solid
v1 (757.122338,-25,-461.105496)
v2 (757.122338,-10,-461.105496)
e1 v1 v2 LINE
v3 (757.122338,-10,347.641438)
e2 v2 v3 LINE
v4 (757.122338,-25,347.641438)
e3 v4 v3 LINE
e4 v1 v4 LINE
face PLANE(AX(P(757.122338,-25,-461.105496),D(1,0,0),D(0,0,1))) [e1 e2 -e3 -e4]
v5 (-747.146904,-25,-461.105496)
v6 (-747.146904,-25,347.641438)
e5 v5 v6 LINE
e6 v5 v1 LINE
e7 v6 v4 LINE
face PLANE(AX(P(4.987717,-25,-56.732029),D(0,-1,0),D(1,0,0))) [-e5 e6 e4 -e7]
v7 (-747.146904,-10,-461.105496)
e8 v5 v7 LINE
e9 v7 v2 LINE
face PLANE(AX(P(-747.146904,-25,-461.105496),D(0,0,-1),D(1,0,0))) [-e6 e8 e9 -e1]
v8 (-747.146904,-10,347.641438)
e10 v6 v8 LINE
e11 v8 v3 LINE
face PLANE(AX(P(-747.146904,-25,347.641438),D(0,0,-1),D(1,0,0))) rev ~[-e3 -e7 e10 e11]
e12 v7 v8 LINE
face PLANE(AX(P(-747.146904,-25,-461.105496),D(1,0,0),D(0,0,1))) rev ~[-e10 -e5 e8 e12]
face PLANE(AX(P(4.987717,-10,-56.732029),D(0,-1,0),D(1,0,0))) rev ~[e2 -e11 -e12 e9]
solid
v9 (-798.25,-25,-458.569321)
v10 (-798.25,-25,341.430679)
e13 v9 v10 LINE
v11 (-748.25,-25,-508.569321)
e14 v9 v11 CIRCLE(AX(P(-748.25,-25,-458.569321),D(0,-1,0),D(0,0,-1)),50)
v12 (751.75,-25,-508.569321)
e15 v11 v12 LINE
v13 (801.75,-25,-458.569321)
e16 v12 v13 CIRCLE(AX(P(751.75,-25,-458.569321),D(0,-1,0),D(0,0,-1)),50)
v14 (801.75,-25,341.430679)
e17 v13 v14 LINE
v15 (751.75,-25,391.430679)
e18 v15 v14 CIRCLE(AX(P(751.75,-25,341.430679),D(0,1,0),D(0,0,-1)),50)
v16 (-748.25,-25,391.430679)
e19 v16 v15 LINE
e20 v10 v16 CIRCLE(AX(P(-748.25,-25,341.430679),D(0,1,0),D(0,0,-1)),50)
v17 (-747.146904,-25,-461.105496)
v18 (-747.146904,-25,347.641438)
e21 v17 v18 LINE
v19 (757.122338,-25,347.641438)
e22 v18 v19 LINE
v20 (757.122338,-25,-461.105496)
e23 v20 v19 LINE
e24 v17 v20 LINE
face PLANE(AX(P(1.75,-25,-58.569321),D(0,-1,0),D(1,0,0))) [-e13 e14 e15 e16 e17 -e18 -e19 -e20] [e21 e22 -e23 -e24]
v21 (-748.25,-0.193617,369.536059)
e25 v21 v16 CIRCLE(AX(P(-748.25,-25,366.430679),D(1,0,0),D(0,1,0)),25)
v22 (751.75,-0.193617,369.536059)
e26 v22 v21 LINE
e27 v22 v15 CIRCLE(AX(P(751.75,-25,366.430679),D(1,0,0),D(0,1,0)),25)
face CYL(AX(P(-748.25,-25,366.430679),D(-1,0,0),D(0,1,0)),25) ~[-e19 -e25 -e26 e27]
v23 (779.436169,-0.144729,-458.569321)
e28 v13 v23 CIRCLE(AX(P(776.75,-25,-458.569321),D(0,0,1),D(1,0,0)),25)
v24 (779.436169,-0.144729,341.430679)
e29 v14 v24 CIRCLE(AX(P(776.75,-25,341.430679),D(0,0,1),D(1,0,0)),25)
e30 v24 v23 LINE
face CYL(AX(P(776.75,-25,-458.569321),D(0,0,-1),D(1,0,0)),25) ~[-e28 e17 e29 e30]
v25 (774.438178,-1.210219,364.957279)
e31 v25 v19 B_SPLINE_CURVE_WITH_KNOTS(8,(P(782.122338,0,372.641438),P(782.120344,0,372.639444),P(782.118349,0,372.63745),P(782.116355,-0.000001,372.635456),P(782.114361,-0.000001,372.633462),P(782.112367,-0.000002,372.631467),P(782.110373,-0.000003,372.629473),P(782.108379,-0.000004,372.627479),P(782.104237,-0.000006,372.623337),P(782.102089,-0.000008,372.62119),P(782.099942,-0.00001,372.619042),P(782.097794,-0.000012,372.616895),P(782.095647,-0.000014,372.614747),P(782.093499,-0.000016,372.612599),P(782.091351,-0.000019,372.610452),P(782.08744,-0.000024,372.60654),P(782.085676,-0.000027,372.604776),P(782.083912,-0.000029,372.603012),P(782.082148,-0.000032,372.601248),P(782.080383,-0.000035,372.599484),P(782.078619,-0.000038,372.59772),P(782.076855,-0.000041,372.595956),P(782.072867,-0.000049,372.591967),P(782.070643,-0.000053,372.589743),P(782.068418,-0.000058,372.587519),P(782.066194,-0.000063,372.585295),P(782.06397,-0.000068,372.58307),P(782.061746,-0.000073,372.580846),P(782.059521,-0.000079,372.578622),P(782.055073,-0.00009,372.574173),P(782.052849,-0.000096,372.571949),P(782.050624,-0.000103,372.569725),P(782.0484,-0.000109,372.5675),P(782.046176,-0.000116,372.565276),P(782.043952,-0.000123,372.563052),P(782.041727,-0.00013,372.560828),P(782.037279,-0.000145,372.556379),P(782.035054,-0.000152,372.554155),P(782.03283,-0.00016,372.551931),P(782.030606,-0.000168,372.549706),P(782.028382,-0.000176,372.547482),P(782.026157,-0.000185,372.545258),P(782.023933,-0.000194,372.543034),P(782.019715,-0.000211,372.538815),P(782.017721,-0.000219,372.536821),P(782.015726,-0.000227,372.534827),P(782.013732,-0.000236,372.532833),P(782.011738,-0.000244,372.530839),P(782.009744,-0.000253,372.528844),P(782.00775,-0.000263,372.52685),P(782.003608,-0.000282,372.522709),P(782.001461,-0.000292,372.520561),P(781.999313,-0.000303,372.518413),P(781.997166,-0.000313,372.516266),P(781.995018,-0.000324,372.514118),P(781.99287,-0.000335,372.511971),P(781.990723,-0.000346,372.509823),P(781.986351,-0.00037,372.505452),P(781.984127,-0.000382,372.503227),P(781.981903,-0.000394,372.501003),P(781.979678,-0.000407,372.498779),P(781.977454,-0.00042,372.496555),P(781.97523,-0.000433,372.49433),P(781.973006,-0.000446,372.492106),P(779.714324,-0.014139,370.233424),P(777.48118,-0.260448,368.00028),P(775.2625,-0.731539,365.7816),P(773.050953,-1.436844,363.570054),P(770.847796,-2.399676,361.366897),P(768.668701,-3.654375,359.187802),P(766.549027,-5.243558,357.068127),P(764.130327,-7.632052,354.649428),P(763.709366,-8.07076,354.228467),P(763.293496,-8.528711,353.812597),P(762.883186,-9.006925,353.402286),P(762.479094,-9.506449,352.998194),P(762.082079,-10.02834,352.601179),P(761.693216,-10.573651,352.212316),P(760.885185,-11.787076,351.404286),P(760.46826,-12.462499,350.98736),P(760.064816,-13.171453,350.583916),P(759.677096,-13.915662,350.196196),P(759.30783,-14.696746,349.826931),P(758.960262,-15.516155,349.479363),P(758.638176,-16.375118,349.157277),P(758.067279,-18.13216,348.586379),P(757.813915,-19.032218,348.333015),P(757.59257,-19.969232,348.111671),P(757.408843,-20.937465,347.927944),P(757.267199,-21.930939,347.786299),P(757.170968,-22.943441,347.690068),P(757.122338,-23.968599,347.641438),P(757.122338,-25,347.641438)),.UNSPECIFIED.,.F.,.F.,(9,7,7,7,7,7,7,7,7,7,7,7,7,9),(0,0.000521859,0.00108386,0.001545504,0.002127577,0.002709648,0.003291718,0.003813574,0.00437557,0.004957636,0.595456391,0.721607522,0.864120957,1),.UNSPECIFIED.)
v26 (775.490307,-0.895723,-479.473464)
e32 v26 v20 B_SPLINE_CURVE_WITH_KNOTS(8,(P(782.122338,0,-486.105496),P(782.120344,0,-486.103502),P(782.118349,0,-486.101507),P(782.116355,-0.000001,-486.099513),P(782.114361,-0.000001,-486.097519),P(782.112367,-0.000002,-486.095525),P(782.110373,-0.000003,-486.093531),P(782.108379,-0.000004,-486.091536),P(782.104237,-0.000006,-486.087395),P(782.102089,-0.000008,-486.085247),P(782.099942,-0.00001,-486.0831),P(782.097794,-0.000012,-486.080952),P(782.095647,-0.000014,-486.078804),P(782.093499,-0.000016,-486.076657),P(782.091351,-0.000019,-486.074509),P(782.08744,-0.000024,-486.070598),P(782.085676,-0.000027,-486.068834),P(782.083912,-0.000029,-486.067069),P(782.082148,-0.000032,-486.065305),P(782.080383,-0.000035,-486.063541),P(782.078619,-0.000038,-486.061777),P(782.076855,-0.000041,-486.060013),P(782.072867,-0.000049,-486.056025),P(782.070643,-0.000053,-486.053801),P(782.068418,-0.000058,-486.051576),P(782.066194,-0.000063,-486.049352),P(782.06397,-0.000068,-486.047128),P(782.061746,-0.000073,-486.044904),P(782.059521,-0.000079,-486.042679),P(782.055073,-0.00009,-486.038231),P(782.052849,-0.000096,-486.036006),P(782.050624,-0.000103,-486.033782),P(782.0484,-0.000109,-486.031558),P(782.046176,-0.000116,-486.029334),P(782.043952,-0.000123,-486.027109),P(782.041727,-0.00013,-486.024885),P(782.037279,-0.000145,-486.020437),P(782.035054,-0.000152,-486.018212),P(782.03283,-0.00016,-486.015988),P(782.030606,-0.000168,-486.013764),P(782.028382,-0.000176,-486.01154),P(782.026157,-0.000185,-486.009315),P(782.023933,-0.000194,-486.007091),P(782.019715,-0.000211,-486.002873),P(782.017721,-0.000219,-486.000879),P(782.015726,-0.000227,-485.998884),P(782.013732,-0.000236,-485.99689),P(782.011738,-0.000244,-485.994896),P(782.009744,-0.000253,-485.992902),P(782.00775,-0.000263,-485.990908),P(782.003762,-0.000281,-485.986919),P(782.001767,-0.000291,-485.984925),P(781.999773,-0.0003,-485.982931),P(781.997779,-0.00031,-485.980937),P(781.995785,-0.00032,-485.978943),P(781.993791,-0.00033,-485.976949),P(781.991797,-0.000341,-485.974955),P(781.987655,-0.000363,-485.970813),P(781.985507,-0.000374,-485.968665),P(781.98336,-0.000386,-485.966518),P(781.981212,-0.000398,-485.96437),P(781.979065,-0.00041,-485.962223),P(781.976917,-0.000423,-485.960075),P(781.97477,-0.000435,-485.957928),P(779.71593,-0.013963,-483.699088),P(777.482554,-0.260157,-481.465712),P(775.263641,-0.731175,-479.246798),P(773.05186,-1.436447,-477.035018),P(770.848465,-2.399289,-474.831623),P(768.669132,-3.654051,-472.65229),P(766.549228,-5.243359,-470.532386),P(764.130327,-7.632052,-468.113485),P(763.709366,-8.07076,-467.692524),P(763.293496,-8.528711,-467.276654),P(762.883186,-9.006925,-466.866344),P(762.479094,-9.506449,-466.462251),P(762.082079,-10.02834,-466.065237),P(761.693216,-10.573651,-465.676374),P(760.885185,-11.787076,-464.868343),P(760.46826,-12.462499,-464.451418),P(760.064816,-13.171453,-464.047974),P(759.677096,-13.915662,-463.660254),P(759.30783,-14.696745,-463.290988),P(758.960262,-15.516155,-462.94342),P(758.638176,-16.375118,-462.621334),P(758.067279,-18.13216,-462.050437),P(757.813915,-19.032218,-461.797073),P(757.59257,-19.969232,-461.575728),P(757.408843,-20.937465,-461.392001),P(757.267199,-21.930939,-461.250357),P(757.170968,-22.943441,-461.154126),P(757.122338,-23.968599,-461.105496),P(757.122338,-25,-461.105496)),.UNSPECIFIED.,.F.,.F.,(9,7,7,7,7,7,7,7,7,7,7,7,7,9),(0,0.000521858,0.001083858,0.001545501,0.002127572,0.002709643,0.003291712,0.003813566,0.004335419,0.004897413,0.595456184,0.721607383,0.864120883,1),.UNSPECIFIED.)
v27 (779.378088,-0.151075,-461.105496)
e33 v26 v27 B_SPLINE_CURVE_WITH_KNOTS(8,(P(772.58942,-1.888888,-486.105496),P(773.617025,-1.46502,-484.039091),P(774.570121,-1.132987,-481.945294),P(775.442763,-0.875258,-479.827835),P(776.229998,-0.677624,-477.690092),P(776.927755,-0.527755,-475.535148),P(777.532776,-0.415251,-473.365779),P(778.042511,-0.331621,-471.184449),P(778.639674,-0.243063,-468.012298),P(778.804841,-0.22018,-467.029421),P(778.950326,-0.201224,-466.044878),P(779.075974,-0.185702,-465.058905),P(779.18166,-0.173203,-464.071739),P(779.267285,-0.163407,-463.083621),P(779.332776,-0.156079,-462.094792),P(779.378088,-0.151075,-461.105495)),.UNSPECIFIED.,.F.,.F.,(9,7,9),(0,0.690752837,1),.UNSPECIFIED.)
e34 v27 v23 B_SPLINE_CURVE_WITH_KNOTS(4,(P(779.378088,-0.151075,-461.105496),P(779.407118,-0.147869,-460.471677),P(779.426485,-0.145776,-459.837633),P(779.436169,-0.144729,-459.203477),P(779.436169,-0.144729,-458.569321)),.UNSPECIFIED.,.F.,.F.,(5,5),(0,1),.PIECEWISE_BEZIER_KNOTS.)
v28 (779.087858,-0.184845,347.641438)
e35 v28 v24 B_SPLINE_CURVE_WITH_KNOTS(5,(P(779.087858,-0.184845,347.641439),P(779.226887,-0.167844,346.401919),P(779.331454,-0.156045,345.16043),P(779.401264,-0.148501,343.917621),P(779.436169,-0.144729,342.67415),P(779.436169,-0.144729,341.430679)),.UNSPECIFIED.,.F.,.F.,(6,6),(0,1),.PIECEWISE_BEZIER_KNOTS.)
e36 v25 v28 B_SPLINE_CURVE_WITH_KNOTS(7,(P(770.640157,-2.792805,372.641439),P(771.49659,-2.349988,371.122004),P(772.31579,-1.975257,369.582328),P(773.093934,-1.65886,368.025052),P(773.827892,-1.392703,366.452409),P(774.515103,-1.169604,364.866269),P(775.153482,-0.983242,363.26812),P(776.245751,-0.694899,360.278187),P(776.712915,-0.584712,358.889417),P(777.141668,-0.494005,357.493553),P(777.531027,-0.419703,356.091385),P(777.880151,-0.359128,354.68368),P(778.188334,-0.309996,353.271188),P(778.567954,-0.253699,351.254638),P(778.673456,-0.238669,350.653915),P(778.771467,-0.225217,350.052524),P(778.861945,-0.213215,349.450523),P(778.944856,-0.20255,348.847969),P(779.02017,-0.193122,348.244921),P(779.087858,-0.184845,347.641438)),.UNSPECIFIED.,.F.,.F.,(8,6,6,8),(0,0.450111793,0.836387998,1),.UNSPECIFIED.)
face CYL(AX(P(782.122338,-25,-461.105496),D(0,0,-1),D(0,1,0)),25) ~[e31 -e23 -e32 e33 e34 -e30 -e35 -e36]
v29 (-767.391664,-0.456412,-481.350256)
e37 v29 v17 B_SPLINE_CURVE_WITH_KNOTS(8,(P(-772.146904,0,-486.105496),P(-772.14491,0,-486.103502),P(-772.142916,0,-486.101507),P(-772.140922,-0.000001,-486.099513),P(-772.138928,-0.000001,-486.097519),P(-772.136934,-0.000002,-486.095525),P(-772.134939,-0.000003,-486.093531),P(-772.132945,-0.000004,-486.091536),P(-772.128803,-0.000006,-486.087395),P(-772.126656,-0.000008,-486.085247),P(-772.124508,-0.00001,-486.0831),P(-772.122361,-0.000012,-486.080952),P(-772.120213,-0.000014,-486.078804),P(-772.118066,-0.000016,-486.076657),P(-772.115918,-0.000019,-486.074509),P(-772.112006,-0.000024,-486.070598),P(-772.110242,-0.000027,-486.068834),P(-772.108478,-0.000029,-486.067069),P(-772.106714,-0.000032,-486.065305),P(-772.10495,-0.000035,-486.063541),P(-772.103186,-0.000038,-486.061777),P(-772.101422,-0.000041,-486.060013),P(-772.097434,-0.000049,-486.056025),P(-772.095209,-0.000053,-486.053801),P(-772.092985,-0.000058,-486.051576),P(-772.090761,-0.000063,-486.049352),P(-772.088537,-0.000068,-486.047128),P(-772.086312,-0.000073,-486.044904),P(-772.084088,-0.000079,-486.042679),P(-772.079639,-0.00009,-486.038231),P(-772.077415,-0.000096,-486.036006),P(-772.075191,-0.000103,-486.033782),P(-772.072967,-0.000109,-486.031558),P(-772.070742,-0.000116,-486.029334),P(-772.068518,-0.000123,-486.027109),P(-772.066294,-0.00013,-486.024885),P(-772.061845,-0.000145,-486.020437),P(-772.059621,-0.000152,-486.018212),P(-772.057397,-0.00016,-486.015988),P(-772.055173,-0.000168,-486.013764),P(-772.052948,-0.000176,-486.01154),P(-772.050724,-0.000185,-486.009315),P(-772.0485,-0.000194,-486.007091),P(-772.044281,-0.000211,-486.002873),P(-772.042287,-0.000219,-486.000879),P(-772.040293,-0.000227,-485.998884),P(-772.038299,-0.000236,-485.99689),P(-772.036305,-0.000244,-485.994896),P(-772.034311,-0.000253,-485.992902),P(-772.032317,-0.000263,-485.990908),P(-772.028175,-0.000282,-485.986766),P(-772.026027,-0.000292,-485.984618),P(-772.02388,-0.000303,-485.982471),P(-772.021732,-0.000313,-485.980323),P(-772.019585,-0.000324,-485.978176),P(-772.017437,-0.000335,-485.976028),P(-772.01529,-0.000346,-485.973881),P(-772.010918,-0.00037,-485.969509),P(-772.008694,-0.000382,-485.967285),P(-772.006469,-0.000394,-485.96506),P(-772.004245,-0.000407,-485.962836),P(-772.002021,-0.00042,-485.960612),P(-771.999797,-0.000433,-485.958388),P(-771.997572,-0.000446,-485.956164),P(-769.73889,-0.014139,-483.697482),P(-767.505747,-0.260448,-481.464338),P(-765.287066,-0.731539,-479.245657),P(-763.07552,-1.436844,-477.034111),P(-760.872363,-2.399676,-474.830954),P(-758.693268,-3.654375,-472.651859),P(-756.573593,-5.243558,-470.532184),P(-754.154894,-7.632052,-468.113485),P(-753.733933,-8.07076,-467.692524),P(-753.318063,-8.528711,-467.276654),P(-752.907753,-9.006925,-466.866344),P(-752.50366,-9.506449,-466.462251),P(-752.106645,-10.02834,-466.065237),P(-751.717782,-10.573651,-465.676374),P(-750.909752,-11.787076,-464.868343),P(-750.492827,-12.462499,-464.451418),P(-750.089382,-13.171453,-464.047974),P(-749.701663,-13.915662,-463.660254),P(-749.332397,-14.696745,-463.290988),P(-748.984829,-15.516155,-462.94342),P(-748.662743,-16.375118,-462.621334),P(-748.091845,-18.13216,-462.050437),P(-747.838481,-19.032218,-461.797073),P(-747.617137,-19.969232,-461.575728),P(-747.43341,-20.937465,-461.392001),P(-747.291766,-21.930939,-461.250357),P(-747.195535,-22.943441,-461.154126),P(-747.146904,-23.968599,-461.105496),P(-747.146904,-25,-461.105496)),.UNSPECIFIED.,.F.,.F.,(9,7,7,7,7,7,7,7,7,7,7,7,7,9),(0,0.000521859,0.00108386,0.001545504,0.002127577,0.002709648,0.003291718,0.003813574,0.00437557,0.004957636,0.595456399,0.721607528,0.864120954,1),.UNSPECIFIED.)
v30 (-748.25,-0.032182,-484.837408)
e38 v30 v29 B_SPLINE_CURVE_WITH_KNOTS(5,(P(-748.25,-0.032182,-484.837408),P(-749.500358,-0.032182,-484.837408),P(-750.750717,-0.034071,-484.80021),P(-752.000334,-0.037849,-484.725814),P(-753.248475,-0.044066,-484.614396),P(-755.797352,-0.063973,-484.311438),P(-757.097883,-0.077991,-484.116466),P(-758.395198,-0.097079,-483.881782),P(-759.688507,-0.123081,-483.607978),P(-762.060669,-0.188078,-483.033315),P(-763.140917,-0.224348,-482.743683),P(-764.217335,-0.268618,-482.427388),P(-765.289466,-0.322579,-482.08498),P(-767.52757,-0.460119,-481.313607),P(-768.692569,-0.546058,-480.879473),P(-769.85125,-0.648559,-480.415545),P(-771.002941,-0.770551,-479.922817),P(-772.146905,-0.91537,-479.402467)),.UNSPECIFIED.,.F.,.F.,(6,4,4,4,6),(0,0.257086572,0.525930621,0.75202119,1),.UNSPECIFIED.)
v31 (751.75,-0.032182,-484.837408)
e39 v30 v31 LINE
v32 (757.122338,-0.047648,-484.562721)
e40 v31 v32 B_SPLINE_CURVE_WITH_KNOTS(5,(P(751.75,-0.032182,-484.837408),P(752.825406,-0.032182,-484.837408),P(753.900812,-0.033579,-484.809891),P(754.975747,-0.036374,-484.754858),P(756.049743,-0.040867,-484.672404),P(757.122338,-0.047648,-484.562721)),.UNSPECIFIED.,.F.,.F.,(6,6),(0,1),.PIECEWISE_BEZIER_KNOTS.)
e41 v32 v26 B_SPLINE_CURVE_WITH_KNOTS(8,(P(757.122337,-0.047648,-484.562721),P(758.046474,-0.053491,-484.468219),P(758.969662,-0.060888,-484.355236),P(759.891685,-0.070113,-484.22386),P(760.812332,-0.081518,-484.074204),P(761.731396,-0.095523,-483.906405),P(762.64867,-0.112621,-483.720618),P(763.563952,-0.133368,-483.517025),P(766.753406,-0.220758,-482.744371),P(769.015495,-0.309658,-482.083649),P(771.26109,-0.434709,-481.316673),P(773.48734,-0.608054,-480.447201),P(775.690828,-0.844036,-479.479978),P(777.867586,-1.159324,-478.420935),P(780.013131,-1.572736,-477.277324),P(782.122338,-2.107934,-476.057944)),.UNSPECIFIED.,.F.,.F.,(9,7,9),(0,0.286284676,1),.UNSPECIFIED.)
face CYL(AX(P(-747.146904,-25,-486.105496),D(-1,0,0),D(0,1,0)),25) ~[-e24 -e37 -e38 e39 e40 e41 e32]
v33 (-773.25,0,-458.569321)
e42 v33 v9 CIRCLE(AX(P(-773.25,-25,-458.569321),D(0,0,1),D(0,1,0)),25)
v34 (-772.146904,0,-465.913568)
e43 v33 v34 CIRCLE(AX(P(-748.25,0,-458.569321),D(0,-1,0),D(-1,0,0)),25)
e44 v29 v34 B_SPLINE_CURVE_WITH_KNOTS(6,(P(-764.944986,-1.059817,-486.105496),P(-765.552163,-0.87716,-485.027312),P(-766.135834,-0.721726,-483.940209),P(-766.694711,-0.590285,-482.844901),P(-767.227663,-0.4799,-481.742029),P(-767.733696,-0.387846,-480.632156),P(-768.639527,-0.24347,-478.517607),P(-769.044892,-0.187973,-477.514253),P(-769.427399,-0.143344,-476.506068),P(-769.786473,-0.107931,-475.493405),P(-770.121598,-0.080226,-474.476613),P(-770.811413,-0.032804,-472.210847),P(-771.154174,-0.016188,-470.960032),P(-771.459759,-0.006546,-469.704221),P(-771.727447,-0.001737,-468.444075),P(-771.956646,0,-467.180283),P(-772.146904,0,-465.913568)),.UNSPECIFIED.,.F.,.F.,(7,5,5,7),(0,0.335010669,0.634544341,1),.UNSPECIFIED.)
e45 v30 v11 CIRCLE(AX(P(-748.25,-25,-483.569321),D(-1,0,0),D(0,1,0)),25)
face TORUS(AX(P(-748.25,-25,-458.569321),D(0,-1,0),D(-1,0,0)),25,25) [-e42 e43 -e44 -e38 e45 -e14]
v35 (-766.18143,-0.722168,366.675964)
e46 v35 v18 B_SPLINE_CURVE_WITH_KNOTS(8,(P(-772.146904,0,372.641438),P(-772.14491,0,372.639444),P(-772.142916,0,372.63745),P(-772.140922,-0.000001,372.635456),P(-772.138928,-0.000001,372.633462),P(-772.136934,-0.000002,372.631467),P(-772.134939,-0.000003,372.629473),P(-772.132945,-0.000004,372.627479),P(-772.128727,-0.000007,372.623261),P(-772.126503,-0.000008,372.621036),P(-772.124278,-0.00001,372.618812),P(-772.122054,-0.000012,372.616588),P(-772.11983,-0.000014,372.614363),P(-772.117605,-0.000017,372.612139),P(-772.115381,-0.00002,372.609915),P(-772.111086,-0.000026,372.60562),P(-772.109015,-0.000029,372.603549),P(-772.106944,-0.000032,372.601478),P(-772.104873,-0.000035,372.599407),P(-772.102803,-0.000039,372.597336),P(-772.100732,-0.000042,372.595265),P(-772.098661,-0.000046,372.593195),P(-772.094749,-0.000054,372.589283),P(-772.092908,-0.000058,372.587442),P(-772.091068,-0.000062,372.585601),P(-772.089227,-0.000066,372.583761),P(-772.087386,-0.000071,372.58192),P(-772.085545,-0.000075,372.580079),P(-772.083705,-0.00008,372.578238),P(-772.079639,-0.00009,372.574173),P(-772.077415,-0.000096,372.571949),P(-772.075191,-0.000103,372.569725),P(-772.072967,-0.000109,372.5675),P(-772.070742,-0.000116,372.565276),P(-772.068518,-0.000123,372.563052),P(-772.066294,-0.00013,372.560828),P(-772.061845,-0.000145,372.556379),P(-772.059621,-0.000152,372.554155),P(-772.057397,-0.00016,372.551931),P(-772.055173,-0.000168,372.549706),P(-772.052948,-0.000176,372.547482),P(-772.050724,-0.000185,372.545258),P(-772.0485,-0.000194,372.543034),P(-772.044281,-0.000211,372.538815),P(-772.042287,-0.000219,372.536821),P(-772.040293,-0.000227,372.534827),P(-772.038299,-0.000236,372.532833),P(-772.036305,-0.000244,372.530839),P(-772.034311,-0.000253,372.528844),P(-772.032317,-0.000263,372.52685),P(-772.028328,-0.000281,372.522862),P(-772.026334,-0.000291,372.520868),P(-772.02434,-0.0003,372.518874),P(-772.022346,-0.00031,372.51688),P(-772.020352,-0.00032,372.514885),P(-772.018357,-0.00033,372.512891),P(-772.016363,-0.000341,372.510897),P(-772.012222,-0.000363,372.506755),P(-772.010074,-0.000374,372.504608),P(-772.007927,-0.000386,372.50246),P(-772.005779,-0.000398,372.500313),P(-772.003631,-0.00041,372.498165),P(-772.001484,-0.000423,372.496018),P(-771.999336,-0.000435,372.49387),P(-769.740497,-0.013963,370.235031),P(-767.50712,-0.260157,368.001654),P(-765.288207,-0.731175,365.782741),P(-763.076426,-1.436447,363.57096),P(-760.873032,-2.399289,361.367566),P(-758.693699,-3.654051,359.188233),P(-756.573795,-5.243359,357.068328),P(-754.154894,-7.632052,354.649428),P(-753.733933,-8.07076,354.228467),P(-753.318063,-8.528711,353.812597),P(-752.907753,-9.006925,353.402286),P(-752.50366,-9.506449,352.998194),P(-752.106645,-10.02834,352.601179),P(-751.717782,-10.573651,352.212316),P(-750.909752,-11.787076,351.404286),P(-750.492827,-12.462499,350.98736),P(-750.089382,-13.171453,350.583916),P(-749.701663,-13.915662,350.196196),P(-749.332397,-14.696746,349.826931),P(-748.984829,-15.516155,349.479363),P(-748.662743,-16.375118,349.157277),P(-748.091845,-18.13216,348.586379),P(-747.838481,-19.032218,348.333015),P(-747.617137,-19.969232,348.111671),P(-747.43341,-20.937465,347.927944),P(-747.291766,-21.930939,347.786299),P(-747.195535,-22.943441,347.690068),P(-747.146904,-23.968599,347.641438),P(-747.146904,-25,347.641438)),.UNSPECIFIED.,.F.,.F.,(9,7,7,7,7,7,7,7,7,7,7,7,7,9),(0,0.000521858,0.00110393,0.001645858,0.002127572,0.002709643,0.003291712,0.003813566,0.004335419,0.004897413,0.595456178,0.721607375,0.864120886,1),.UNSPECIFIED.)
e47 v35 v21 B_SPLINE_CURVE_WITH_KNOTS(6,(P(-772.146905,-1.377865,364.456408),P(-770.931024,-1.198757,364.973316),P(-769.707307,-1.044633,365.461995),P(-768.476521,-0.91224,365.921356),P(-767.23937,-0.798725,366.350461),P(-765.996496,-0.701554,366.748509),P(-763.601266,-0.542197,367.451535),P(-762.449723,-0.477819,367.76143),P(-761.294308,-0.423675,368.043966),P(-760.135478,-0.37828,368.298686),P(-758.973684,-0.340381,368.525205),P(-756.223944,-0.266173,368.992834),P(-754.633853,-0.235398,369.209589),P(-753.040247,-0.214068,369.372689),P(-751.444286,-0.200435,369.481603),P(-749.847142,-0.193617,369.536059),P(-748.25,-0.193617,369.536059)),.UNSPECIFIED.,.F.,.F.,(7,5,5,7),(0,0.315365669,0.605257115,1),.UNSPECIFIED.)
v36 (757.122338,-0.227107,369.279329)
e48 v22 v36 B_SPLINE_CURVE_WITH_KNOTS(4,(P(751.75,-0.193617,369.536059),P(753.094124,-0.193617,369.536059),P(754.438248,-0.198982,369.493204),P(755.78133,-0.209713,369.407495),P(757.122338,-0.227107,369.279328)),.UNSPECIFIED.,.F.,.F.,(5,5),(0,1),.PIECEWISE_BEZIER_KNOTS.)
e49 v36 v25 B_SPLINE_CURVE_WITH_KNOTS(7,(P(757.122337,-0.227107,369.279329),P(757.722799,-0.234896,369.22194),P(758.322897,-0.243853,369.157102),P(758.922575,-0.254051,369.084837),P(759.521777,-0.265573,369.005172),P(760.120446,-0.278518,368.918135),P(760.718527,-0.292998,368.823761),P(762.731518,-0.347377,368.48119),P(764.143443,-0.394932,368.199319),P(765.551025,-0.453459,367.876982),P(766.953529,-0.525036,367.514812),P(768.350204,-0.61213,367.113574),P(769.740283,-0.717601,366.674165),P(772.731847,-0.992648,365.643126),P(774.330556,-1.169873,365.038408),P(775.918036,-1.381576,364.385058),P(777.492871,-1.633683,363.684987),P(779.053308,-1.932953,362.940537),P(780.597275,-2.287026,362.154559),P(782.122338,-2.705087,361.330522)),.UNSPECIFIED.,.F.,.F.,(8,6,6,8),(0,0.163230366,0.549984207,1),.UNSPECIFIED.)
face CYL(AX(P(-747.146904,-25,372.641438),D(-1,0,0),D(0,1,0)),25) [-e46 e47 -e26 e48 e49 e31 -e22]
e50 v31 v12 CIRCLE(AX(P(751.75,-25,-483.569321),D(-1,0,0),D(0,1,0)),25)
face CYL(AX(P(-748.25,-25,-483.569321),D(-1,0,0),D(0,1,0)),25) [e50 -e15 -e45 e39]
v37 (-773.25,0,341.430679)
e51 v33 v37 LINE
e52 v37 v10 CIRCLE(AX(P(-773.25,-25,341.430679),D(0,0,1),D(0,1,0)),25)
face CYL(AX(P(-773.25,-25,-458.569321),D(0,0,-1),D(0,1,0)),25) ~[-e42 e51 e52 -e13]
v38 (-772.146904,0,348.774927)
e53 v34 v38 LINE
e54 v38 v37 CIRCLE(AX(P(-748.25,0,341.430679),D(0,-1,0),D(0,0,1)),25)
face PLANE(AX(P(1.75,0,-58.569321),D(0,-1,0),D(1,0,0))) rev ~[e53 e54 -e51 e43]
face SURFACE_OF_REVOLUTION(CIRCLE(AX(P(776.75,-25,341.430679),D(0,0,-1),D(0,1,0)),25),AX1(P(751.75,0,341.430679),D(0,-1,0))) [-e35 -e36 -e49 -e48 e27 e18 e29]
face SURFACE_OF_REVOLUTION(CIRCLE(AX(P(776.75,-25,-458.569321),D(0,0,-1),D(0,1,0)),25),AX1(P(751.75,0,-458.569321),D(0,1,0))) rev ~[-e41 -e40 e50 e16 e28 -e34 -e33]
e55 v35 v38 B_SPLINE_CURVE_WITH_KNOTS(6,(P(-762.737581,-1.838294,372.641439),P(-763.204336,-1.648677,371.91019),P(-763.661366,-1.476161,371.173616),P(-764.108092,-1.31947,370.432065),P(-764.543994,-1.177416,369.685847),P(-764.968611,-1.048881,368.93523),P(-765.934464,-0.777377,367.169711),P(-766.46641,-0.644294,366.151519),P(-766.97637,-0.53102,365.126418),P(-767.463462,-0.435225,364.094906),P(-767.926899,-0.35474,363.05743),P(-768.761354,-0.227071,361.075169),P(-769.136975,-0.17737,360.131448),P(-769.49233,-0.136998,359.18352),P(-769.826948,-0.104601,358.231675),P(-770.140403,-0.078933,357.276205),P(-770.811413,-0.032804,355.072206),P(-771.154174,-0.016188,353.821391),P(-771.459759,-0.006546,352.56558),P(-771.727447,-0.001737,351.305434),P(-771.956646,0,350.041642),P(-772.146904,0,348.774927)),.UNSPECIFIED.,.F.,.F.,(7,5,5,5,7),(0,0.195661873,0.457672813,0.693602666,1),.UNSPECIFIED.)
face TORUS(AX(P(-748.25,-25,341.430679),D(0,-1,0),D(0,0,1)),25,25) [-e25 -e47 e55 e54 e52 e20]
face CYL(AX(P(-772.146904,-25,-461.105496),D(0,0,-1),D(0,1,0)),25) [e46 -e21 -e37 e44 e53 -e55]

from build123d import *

# Parameters (mm, degrees)
F0_W         = 1600
F0_H         = 900
F0_W_2       = 1504.2692422867
F0_H_2       = 808.7469339371
F1_DEPTH     = 25
F2_W         = 1504.2692422867
F2_H         = 808.7469339371
F3_DEPTH     = 15
F4_R         = 50
F5_T1_DEPTH  = 808.7469339371
F5_T3_DEPTH  = 1504.2692422867
F5_T5_DEPTH  = 800
F5_T7_DEPTH  = 1500
F5_T10_ANGLE = 90
F5_T12_ANGLE = 90
F5_T14_ANGLE = 90
F5_T16_ANGLE = 90
F5_T21_DEPTH = 1566.7692422867
F5_T25_DEPTH = 871.2469339371
F5_T32_DEPTH = 871.2469339371
F5_T36_DEPTH = 1566.7692422867
F5_T43_DEPTH = 1566.7692422867
F5_T47_DEPTH = 871.2469339371
F5_T54_DEPTH = 1566.7692422867
F5_T58_DEPTH = 871.2469339371


# Not quite as in the source:
# - a fillet or chamfer that OpenCascade refuses, or shapes differently, is made with other operations: its cross-section is extruded or revolved along the edge and cut away or added


with BuildPart() as f1:
    # F0 (on Front) → F1 (new body)
    with BuildSketch(Plane.XZ):
        with Locations((1.7499998212, -58.5693205115)):
            Rectangle(F0_W, F0_H)
        with Locations((4.9877166748, -56.7320287228)):
            Rectangle(F0_W_2, F0_H_2, mode=Mode.SUBTRACT)
    extrude(amount=F1_DEPTH)

    # F4
    f4_edges = [f1.edges().sort_by_distance(p)[0] for p in [
        (801.75, -12.5, 391.430679),
        (801.75, -12.5, -508.569321),
        (-798.25, -12.5, -508.569321),
        (-798.25, -12.5, 391.430679),
    ]]
    fillet(f4_edges, radius=F4_R)

    # F5: fillet of radius 25 on 12 edges, made by hand

    # F5_s2 → F5_t1 (cut)
    with BuildSketch(Plane.XY.offset(-461.1054956913)):
        with BuildLine():
            ThreePointArc((782.1223378181, 0), (764.4446682885, -7.3223304703), (757.1223378181, -25))
            Line((757.1223378181, -25), (757.1223378181, 0))
            Line((757.1223378181, 0), (782.1223378181, 0))
        make_face()
        with BuildLine():
            ThreePointArc((-772.1469044685, 0), (-754.4692349389, -7.3223304703), (-747.1469044685, -25))
            Line((-747.1469044685, -25), (-747.1469044685, 0))
            Line((-747.1469044685, 0), (-772.1469044685, 0))
        make_face()
    extrude(amount=F5_T1_DEPTH, mode=Mode.SUBTRACT)

    # F5_s4 → F5_t3 (cut)
    with BuildSketch(Plane.YZ.offset(-747.1469044685)):
        with BuildLine():
            ThreePointArc((0, 372.6414382458), (-7.3223304703, 354.9637687161), (-25, 347.6414382458))
            Line((-25, 347.6414382458), (0, 347.6414382458))
            Line((0, 347.6414382458), (0, 372.6414382458))
        make_face()
        with BuildLine():
            ThreePointArc((0, -486.1054956913), (-7.3223304703, -468.4278261616), (-25, -461.1054956913))
            Line((-25, -461.1054956913), (0, -461.1054956913))
            Line((0, -461.1054956913), (0, -486.1054956913))
        make_face()
    extrude(amount=F5_T3_DEPTH, mode=Mode.SUBTRACT)

    # F5_s6 → F5_t5 (cut)
    with BuildSketch(Plane.XY.offset(-458.5693205115)):
        with BuildLine():
            ThreePointArc((-773.2500001788, 0), (-790.9276697085, -7.3223304703), (-798.2500001788, -25))
            Line((-798.2500001788, -25), (-798.2500001788, 0))
            Line((-798.2500001788, 0), (-773.2500001788, 0))
        make_face()
        with BuildLine():
            ThreePointArc((801.7499998212, -25), (794.4276693508, -7.3223304703), (776.7499998212, 0))
            Line((776.7499998212, 0), (801.7499998212, 0))
            Line((801.7499998212, 0), (801.7499998212, -25))
        make_face()
    extrude(amount=F5_T5_DEPTH, mode=Mode.SUBTRACT)

    # F5_s8 → F5_t7 (cut)
    with BuildSketch(Plane.YZ.offset(-748.2500001788)):
        with BuildLine():
            ThreePointArc((0, 366.4306794885), (-7.3223304703, 384.1083490182), (-25, 391.4306794885))
            Line((-25, 391.4306794885), (0, 391.4306794885))
            Line((0, 391.4306794885), (0, 366.4306794885))
        make_face()
        with BuildLine():
            ThreePointArc((0, -483.5693205115), (-7.3223304703, -501.2469900411), (-25, -508.5693205115))
            Line((-25, -508.5693205115), (0, -508.5693205115))
            Line((0, -508.5693205115), (0, -483.5693205115))
        make_face()
    extrude(amount=F5_T7_DEPTH, mode=Mode.SUBTRACT)

    # F5_s9 → F5_t10 (revolve, cut)
    with BuildSketch(Plane.YZ.offset(-748.2500001788)):
        with BuildLine():
            ThreePointArc((0, 366.4306794885), (-7.3223304703, 384.1083490182), (-25, 391.4306794885))
            Line((-25, 391.4306794885), (0, 391.4306794885))
            Line((0, 391.4306794885), (0, 366.4306794885))
        make_face()
    revolve(axis=Axis((-748.2500001788, 0, 341.4306794885), (0, -1, 0)), revolution_arc=F5_T10_ANGLE, mode=Mode.SUBTRACT)

    # F5_s11 → F5_t12 (revolve, cut)
    with BuildSketch(Plane.XY.offset(341.4306794885)):
        with BuildLine():
            ThreePointArc((776.7499998212, 0), (794.4276693508, -7.3223304703), (801.7499998212, -25))
            Line((801.7499998212, -25), (801.7499998212, 0))
            Line((801.7499998212, 0), (776.7499998212, 0))
        make_face()
    revolve(axis=Axis((751.7499998212, 0, 341.4306794885), (0, -1, 0)), revolution_arc=F5_T12_ANGLE, mode=Mode.SUBTRACT)

    # F5_s13 → F5_t14 (revolve, cut)
    with BuildSketch(Plane.XY.offset(-458.5693205115)):
        with BuildLine():
            ThreePointArc((776.7499998212, 0), (794.4276693508, -7.3223304703), (801.7499998212, -25))
            Line((801.7499998212, -25), (801.7499998212, 0))
            Line((801.7499998212, 0), (776.7499998212, 0))
        make_face()
    revolve(axis=Axis((751.7499998212, 0, -458.5693205115), (0, 1, 0)), revolution_arc=F5_T14_ANGLE, mode=Mode.SUBTRACT)

    # F5_s15 → F5_t16 (revolve, cut)
    with BuildSketch(Plane.XY.offset(-458.5693205115)):
        with BuildLine():
            ThreePointArc((-773.2500001788, 0), (-790.9276697085, -7.3223304703), (-798.2500001788, -25))
            Line((-798.2500001788, -25), (-798.2500001788, 0))
            Line((-798.2500001788, 0), (-773.2500001788, 0))
        make_face()
    revolve(axis=Axis((-748.2500001788, 0, -458.5693205115), (0, -1, 0)), revolution_arc=F5_T16_ANGLE, mode=Mode.SUBTRACT)


with BuildPart() as f3:
    # F2 (on face) → F3 (new body)
    with BuildSketch(Plane.XZ.offset(25)):
        with Locations((4.9877166748, -56.7320287228)):
            Rectangle(F2_W, F2_H)
    extrude(amount=-F3_DEPTH)


with BuildPart() as f5_tool19:
    # F5_s20 → F5_t21 (new body)
    with BuildSketch(Plane.YZ.offset(-747.1469044685)):
        with BuildLine():
            ThreePointArc((0, 372.6414382458), (-7.3223304703, 354.9637687161), (-25, 347.6414382458))
            Line((-25, 347.6414382458), (0, 347.6414382458))
            Line((0, 347.6414382458), (0, 372.6414382458))
        make_face()
    extrude(amount=F5_T21_DEPTH)

    split(bisect_by=Plane.YZ.offset(757.1223378181), keep=Keep.TOP)


with BuildPart() as f5_tool23:
    # F5_s24 → F5_t25 (new body)
    with BuildSketch(Plane.XY.offset(410.1414382458)):
        with BuildLine():
            ThreePointArc((782.1223378181, 0), (764.4446682885, -7.3223304703), (757.1223378181, -25))
            Line((757.1223378181, -25), (757.1223378181, 0))
            Line((757.1223378181, 0), (782.1223378181, 0))
        make_face()
    extrude(amount=-F5_T25_DEPTH)

    split(bisect_by=Plane.XY.offset(347.6414382458), keep=Keep.TOP)


with BuildPart() as f5_tool19_1:
    add(f5_tool19.part)

    # F5_t27: intersect F5_tool23
    add(f5_tool23.part, mode=Mode.INTERSECT)


with BuildPart() as f1_1:
    add(f1.part)

    # F5_t17: cut F5_tool19
    add(f5_tool19_1.part, mode=Mode.SUBTRACT)


with BuildPart() as f5_tool30:
    # F5_s31 → F5_t32 (new body)
    with BuildSketch(Plane.XY.offset(347.6414382458)):
        with BuildLine():
            ThreePointArc((782.1223378181, 0), (764.4446682885, -7.3223304703), (757.1223378181, -25))
            Line((757.1223378181, -25), (757.1223378181, 0))
            Line((757.1223378181, 0), (782.1223378181, 0))
        make_face()
    extrude(amount=-F5_T32_DEPTH)

    split(bisect_by=Plane.XY.offset(-461.1054956913), keep=Keep.BOTTOM)


with BuildPart() as f5_tool34:
    # F5_s35 → F5_t36 (new body)
    with BuildSketch(Plane.YZ.offset(819.6223378181)):
        with BuildLine():
            ThreePointArc((0, -486.1054956913), (-7.3223304703, -468.4278261616), (-25, -461.1054956913))
            Line((-25, -461.1054956913), (0, -461.1054956913))
            Line((0, -461.1054956913), (0, -486.1054956913))
        make_face()
    extrude(amount=-F5_T36_DEPTH)

    split(bisect_by=Plane.YZ.offset(757.1223378181), keep=Keep.TOP)


with BuildPart() as f5_tool30_1:
    add(f5_tool30.part)

    # F5_t38: intersect F5_tool34
    add(f5_tool34.part, mode=Mode.INTERSECT)


with BuildPart() as f1_2:
    add(f1_1.part)

    # F5_t28: cut F5_tool30
    add(f5_tool30_1.part, mode=Mode.SUBTRACT)


with BuildPart() as f5_tool41:
    # F5_s42 → F5_t43 (new body)
    with BuildSketch(Plane.YZ.offset(-809.6469044685)):
        with BuildLine():
            ThreePointArc((0, 372.6414382458), (-7.3223304703, 354.9637687161), (-25, 347.6414382458))
            Line((-25, 347.6414382458), (0, 347.6414382458))
            Line((0, 347.6414382458), (0, 372.6414382458))
        make_face()
    extrude(amount=F5_T43_DEPTH)

    split(bisect_by=Plane.YZ.offset(-747.1469044685), keep=Keep.BOTTOM)


with BuildPart() as f5_tool45:
    # F5_s46 → F5_t47 (new body)
    with BuildSketch(Plane.XY.offset(-461.1054956913)):
        with BuildLine():
            ThreePointArc((-772.1469044685, 0), (-754.4692349389, -7.3223304703), (-747.1469044685, -25))
            Line((-747.1469044685, -25), (-747.1469044685, 0))
            Line((-747.1469044685, 0), (-772.1469044685, 0))
        make_face()
    extrude(amount=F5_T47_DEPTH)

    split(bisect_by=Plane.XY.offset(347.6414382458), keep=Keep.TOP)


with BuildPart() as f5_tool41_1:
    add(f5_tool41.part)

    # F5_t49: intersect F5_tool45
    add(f5_tool45.part, mode=Mode.INTERSECT)


with BuildPart() as f1_3:
    add(f1_2.part)

    # F5_t39: cut F5_tool41
    add(f5_tool41_1.part, mode=Mode.SUBTRACT)


with BuildPart() as f5_tool52:
    # F5_s53 → F5_t54 (new body)
    with BuildSketch(Plane.YZ.offset(757.1223378181)):
        with BuildLine():
            ThreePointArc((0, -486.1054956913), (-7.3223304703, -468.4278261616), (-25, -461.1054956913))
            Line((-25, -461.1054956913), (0, -461.1054956913))
            Line((0, -461.1054956913), (0, -486.1054956913))
        make_face()
    extrude(amount=-F5_T54_DEPTH)

    split(bisect_by=Plane.YZ.offset(-747.1469044685), keep=Keep.BOTTOM)


with BuildPart() as f5_tool56:
    # F5_s57 → F5_t58 (new body)
    with BuildSketch(Plane.XY.offset(-523.6054956913)):
        with BuildLine():
            ThreePointArc((-772.1469044685, 0), (-754.4692349389, -7.3223304703), (-747.1469044685, -25))
            Line((-747.1469044685, -25), (-747.1469044685, 0))
            Line((-747.1469044685, 0), (-772.1469044685, 0))
        make_face()
    extrude(amount=F5_T58_DEPTH)

    split(bisect_by=Plane.XY.offset(-461.1054956913), keep=Keep.BOTTOM)


with BuildPart() as f5_tool52_1:
    add(f5_tool52.part)

    # F5_t60: intersect F5_tool56
    add(f5_tool56.part, mode=Mode.INTERSECT)


with BuildPart() as f1_4:
    add(f1_3.part)

    # F5_t50: cut F5_tool52
    add(f5_tool52_1.part, mode=Mode.SUBTRACT)


solid = Compound([f3.part, f1_4.part])
